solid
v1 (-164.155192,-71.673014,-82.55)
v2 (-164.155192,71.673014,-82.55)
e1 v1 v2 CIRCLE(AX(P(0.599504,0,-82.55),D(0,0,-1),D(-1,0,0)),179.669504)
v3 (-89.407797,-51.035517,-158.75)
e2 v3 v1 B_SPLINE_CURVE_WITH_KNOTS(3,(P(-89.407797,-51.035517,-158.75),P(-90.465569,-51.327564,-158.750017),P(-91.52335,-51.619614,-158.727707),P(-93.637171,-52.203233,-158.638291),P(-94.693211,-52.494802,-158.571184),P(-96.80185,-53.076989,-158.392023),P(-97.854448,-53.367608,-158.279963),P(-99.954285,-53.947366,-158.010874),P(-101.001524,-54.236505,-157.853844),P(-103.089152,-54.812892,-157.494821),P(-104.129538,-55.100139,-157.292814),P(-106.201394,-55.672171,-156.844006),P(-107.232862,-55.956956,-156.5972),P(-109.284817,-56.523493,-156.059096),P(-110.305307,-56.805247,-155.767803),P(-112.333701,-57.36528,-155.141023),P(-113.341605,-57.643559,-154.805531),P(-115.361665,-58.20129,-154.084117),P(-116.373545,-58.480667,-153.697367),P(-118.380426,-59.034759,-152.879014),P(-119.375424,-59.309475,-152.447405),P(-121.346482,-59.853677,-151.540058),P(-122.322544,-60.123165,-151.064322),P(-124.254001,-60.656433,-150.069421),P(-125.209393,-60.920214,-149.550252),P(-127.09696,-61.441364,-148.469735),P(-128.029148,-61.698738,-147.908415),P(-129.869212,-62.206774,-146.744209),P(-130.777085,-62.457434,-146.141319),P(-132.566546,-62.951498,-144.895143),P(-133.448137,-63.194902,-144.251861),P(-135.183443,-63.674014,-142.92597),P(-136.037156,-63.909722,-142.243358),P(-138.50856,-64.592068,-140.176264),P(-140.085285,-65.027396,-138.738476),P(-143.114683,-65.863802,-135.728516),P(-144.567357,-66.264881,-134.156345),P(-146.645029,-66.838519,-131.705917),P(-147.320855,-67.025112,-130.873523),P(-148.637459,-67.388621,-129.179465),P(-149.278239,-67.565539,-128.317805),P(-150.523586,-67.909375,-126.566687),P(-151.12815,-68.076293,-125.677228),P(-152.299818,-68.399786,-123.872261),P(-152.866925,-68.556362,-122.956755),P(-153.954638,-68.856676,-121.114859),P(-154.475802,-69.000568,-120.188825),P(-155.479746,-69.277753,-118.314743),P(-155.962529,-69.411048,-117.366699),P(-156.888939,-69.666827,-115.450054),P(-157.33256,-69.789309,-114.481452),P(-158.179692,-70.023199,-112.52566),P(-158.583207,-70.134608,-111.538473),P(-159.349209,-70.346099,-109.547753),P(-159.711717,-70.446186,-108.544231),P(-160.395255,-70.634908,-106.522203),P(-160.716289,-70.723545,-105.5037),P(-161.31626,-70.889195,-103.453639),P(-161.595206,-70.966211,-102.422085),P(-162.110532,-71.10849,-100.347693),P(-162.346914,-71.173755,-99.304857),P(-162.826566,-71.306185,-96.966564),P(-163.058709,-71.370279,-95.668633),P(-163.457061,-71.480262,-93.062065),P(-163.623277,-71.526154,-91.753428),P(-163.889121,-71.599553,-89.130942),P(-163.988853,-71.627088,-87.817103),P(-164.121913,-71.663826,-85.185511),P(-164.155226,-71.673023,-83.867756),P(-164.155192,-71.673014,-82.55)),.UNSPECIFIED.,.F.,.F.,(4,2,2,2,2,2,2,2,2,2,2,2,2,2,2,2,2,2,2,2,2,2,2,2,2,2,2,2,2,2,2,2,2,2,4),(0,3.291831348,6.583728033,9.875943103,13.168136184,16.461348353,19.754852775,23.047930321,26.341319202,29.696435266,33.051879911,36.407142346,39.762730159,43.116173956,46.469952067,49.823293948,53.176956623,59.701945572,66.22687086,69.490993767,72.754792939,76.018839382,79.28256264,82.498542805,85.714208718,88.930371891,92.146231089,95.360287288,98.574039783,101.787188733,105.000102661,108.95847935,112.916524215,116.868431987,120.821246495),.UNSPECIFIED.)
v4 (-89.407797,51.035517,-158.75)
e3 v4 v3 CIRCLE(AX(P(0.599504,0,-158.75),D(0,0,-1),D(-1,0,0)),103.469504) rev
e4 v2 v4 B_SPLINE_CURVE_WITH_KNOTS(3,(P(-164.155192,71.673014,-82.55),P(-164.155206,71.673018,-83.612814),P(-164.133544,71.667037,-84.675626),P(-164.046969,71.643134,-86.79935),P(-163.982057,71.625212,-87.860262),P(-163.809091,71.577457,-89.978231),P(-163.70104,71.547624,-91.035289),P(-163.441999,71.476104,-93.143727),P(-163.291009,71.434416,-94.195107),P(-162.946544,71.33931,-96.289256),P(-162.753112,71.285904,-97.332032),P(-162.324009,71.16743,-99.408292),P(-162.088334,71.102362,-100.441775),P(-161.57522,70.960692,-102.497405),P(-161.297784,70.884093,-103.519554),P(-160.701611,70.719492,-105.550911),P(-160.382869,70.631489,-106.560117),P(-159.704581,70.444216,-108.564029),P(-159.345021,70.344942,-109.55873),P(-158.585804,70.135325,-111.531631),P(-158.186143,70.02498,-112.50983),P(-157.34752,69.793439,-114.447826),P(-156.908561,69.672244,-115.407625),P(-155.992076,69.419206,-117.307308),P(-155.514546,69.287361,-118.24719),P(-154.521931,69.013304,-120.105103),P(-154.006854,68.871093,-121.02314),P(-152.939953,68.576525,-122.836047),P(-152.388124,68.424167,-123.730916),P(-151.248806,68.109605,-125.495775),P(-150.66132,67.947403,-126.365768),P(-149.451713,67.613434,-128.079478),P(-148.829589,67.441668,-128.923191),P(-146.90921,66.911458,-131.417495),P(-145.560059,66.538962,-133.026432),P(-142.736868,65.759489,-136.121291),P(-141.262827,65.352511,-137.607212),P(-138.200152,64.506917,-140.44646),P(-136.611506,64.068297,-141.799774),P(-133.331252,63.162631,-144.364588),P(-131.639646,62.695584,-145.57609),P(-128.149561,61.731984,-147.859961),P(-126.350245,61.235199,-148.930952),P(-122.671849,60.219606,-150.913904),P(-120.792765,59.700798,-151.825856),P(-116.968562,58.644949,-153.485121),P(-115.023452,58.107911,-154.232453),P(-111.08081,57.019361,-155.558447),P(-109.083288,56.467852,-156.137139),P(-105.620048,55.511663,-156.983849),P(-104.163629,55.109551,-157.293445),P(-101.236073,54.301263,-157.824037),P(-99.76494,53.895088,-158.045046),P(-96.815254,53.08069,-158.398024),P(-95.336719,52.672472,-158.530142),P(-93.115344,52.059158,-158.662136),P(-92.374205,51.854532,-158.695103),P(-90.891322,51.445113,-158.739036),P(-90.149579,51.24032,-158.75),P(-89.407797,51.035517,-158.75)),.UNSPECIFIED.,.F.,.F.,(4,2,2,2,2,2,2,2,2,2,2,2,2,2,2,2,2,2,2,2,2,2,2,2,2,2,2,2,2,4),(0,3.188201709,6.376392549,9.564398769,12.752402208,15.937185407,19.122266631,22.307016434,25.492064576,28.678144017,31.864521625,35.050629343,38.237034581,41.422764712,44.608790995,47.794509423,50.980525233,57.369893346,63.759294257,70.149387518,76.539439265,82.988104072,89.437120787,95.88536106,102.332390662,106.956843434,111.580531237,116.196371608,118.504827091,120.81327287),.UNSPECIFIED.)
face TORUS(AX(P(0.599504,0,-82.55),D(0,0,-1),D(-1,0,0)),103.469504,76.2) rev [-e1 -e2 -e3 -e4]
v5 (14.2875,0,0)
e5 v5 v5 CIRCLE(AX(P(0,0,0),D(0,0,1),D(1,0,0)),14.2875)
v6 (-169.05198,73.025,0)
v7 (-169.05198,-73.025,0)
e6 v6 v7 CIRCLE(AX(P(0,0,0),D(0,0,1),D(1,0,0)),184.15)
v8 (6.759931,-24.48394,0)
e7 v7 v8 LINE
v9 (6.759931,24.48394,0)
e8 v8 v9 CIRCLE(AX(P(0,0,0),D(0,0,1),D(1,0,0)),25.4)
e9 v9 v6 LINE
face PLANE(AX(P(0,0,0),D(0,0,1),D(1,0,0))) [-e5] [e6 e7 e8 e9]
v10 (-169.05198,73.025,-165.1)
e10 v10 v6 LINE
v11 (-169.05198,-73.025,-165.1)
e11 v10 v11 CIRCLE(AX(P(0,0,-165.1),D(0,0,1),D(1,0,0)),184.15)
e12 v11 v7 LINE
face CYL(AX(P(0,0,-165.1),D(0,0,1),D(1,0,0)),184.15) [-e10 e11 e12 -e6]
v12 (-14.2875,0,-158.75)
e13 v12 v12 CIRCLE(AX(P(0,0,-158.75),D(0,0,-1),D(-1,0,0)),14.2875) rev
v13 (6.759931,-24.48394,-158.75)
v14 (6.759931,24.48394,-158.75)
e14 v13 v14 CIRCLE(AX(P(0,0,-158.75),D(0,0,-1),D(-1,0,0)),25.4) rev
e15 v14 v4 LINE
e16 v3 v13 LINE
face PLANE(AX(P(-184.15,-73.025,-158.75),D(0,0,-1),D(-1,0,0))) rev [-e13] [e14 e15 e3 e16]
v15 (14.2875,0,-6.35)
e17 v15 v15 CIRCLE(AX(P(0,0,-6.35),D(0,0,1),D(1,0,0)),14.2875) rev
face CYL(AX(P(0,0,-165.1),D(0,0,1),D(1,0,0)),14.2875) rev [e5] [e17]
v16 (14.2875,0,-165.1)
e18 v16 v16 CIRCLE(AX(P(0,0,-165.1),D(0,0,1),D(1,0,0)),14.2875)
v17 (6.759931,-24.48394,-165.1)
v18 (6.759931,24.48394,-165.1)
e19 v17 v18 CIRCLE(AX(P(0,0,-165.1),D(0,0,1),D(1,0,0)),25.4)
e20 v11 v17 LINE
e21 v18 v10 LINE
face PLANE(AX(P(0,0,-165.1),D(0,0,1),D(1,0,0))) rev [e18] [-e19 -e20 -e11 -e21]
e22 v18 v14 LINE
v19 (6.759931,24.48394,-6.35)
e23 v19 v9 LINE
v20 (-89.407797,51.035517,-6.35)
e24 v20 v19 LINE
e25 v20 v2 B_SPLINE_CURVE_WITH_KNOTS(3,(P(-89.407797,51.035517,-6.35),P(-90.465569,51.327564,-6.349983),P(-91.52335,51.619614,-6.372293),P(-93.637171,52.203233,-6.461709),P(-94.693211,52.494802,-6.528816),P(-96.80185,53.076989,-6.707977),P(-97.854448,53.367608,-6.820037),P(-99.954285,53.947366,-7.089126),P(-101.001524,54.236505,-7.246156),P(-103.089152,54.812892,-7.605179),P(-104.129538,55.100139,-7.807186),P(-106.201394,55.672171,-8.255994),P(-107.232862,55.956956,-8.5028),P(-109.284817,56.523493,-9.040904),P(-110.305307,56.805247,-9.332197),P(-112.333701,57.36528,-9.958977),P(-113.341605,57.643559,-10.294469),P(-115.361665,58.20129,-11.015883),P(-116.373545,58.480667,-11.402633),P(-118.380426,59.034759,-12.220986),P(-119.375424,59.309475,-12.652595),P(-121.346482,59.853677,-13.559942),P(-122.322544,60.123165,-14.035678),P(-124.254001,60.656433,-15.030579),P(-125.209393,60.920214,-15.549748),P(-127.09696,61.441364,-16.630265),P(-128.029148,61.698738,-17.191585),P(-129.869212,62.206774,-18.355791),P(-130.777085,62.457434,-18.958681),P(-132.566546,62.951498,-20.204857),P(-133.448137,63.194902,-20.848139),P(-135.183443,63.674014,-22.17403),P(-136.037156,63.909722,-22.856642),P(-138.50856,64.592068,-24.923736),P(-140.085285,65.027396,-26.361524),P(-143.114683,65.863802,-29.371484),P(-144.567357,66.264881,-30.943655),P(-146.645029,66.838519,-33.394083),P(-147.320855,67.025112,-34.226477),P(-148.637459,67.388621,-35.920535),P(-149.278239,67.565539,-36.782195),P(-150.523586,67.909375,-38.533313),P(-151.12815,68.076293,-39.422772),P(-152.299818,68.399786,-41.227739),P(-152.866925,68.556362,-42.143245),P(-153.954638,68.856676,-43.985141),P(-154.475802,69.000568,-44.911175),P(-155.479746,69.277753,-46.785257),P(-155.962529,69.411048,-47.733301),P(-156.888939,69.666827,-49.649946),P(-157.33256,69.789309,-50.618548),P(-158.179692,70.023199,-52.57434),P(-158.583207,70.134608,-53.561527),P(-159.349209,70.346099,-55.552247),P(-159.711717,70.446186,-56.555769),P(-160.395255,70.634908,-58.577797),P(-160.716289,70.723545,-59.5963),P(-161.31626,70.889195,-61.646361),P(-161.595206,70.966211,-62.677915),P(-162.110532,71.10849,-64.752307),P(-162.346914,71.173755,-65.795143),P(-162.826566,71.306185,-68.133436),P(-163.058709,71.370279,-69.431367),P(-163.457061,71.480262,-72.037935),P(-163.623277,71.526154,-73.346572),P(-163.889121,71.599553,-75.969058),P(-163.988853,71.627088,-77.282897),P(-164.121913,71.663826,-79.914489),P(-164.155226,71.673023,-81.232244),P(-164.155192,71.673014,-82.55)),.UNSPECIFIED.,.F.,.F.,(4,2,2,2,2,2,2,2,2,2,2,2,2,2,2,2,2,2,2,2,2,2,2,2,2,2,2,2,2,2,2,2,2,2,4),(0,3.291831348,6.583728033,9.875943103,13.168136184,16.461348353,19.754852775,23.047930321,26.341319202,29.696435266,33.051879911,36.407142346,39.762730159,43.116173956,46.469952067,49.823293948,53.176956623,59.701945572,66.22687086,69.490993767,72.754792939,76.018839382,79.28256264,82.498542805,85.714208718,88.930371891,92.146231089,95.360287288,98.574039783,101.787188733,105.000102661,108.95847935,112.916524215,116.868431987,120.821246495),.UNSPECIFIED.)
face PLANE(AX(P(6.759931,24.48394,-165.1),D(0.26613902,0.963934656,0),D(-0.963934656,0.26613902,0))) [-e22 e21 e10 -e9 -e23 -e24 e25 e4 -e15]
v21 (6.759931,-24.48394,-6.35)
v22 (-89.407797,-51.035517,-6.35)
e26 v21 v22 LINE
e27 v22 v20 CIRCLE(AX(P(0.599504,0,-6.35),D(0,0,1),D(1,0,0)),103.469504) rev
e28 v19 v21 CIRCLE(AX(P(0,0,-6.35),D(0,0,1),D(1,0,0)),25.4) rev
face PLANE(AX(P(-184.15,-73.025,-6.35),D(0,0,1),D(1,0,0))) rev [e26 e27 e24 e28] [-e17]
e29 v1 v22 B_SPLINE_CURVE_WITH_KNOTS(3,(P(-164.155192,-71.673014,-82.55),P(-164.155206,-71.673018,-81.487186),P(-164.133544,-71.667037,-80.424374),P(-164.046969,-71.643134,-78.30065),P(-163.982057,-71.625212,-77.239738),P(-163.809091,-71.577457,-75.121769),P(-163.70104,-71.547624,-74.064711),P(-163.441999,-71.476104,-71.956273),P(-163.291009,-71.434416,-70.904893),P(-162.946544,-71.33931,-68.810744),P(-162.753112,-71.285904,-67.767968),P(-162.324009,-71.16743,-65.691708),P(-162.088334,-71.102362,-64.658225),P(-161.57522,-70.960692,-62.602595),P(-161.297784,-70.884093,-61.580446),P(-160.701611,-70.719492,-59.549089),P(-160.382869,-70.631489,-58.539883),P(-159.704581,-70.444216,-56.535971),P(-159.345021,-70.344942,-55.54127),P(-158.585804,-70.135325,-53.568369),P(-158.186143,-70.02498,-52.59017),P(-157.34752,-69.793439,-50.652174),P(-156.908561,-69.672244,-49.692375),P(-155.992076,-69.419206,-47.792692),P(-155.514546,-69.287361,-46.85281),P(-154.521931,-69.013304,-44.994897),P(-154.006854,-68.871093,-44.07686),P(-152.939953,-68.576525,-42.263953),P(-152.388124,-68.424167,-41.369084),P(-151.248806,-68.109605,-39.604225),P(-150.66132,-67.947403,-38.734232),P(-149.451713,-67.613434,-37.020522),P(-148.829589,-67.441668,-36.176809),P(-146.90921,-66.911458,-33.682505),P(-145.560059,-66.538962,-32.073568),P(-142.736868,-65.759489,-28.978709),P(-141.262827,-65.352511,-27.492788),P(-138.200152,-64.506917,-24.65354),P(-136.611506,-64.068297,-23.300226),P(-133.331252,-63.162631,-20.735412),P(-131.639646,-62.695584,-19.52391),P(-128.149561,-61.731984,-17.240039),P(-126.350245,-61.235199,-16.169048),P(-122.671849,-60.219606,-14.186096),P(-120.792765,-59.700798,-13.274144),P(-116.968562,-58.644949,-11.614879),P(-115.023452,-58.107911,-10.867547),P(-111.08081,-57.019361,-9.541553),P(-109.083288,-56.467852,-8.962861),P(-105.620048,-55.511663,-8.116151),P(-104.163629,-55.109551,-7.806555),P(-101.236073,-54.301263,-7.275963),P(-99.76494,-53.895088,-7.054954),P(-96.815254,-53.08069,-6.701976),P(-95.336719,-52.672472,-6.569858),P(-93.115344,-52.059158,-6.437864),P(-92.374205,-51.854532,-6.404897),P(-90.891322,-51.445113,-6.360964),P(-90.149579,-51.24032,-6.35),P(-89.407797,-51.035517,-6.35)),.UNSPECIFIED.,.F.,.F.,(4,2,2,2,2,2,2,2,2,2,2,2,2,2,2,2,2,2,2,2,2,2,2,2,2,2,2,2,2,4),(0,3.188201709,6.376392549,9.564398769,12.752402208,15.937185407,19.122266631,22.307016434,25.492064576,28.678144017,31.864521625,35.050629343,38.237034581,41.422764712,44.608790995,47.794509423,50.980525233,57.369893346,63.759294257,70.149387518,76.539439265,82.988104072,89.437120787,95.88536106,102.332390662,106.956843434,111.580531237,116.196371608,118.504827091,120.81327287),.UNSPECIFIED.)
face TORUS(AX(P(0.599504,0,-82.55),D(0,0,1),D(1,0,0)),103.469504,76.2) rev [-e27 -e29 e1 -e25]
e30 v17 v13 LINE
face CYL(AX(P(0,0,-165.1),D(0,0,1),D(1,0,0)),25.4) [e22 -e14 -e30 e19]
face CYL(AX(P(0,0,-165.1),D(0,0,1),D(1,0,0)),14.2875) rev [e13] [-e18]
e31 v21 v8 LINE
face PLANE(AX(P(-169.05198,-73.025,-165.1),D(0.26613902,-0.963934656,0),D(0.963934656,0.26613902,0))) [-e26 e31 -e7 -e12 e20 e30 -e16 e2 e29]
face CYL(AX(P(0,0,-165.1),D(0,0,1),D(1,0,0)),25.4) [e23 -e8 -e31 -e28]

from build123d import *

# Parameters (mm, degrees)
SKETCH1_R               = 14.287500000000001
BOSS_EXTRUDE1_DEPTH     = 165.1
CUT_EXTRUDE1_DEPTH      = 258.8795903614708
CUT_EXTRUDE1_DEPTH_BACK = 258.8795903614708
BOSS_EXTRUDE2_DEPTH     = 152.4
FILLET2_R               = 76.2


with BuildPart() as part:
    # Sketch1 → Boss-Extrude1 (new body)
    with BuildSketch(Plane.XY):
        with BuildLine():
            Line((6.759931115856893, 24.483940273347972), (-169.05197980207154, 73.02499999999999))
            ThreePointArc((-169.05197980207154, 73.02499999999999), (-184.15, 2.255e-14), (-169.05197980207154, -73.02499999999999))
            Line((-169.05197980207154, -73.02499999999999), (6.759931115856893, -24.483940273347972))
            ThreePointArc((6.759931115856893, -24.483940273347972), (25.40000000000002, 0), (6.759931115856893, 24.483940273347972))
        make_face()
        Circle(SKETCH1_R, mode=Mode.SUBTRACT)
    extrude(amount=-BOSS_EXTRUDE1_DEPTH)

    # Sketch2 → Cut-Extrude1 (cut, two sides: drawn at the far end of the back side and taken through both)
    with BuildSketch(Plane(origin=(0, 0, 0), x_dir=(1, 0, 0), z_dir=(0, 1, 0)).offset(-CUT_EXTRUDE1_DEPTH_BACK)):
        Polygon((-184.15, 158.75), (25.400000000000006, 158.75), (25.39999999999999, 6.35), (-184.14999999999998, 6.349999999999994), align=None)
    extrude(amount=CUT_EXTRUDE1_DEPTH + CUT_EXTRUDE1_DEPTH_BACK, mode=Mode.SUBTRACT)


with BuildPart() as cut_extrude1_piece_1:
    # of the separate pieces the step leaves, piece 1, a body of its own (cut_extrude1_pieces)
    add(part.part.solids().sort_by_distance((-169.051979802, -73.025, 0))[0])



with BuildPart() as cut_extrude1_piece_2:
    # of the separate pieces the step leaves, piece 2, a body of its own (cut_extrude1_pieces)
    add(part.part.solids().sort_by_distance((-169.051979802, -73.025, -158.75))[0])


with BuildPart() as cut_extrude1_piece_1_1:
    add(cut_extrude1_piece_1.part)

    add(cut_extrude1_piece_2.part)  # Boss-Extrude2 merges Cut-Extrude1 piece 2
    # Sketch3 → Boss-Extrude2 (add)
    with BuildSketch(Plane.XY.offset(-158.75)):
        with BuildLine():
            Line((-169.05197980207154, 73.02499999999999), (-164.155191747402, 71.67301377682864))
            ThreePointArc((-164.155191747402, 71.67301377682864), (-179.07, 3.242e-14), (-164.15519174740194, -71.67301377682858))
            Line((-164.15519174740194, -71.67301377682858), (-169.05197980207154, -73.02499999999998))
            ThreePointArc((-169.05197980207154, -73.02499999999998), (-184.15, 1.0433e-13), (-169.05197980207154, 73.02499999999999))
        make_face()
    extrude(amount=BOSS_EXTRUDE2_DEPTH)

    # Fillet2
    fillet2_edges = [cut_extrude1_piece_1_1.edges().sort_by_distance(p)[0] for p in [
        (-179.06999999999994, 1.066e-14, -6.349999999999994),
        (-179.06999999999994, 1.066e-14, -158.75),
    ]]
    fillet(fillet2_edges, radius=FILLET2_R - 0.0001)  # a hair under: the kernel refuses the full size


solid = cut_extrude1_piece_1_1.part
